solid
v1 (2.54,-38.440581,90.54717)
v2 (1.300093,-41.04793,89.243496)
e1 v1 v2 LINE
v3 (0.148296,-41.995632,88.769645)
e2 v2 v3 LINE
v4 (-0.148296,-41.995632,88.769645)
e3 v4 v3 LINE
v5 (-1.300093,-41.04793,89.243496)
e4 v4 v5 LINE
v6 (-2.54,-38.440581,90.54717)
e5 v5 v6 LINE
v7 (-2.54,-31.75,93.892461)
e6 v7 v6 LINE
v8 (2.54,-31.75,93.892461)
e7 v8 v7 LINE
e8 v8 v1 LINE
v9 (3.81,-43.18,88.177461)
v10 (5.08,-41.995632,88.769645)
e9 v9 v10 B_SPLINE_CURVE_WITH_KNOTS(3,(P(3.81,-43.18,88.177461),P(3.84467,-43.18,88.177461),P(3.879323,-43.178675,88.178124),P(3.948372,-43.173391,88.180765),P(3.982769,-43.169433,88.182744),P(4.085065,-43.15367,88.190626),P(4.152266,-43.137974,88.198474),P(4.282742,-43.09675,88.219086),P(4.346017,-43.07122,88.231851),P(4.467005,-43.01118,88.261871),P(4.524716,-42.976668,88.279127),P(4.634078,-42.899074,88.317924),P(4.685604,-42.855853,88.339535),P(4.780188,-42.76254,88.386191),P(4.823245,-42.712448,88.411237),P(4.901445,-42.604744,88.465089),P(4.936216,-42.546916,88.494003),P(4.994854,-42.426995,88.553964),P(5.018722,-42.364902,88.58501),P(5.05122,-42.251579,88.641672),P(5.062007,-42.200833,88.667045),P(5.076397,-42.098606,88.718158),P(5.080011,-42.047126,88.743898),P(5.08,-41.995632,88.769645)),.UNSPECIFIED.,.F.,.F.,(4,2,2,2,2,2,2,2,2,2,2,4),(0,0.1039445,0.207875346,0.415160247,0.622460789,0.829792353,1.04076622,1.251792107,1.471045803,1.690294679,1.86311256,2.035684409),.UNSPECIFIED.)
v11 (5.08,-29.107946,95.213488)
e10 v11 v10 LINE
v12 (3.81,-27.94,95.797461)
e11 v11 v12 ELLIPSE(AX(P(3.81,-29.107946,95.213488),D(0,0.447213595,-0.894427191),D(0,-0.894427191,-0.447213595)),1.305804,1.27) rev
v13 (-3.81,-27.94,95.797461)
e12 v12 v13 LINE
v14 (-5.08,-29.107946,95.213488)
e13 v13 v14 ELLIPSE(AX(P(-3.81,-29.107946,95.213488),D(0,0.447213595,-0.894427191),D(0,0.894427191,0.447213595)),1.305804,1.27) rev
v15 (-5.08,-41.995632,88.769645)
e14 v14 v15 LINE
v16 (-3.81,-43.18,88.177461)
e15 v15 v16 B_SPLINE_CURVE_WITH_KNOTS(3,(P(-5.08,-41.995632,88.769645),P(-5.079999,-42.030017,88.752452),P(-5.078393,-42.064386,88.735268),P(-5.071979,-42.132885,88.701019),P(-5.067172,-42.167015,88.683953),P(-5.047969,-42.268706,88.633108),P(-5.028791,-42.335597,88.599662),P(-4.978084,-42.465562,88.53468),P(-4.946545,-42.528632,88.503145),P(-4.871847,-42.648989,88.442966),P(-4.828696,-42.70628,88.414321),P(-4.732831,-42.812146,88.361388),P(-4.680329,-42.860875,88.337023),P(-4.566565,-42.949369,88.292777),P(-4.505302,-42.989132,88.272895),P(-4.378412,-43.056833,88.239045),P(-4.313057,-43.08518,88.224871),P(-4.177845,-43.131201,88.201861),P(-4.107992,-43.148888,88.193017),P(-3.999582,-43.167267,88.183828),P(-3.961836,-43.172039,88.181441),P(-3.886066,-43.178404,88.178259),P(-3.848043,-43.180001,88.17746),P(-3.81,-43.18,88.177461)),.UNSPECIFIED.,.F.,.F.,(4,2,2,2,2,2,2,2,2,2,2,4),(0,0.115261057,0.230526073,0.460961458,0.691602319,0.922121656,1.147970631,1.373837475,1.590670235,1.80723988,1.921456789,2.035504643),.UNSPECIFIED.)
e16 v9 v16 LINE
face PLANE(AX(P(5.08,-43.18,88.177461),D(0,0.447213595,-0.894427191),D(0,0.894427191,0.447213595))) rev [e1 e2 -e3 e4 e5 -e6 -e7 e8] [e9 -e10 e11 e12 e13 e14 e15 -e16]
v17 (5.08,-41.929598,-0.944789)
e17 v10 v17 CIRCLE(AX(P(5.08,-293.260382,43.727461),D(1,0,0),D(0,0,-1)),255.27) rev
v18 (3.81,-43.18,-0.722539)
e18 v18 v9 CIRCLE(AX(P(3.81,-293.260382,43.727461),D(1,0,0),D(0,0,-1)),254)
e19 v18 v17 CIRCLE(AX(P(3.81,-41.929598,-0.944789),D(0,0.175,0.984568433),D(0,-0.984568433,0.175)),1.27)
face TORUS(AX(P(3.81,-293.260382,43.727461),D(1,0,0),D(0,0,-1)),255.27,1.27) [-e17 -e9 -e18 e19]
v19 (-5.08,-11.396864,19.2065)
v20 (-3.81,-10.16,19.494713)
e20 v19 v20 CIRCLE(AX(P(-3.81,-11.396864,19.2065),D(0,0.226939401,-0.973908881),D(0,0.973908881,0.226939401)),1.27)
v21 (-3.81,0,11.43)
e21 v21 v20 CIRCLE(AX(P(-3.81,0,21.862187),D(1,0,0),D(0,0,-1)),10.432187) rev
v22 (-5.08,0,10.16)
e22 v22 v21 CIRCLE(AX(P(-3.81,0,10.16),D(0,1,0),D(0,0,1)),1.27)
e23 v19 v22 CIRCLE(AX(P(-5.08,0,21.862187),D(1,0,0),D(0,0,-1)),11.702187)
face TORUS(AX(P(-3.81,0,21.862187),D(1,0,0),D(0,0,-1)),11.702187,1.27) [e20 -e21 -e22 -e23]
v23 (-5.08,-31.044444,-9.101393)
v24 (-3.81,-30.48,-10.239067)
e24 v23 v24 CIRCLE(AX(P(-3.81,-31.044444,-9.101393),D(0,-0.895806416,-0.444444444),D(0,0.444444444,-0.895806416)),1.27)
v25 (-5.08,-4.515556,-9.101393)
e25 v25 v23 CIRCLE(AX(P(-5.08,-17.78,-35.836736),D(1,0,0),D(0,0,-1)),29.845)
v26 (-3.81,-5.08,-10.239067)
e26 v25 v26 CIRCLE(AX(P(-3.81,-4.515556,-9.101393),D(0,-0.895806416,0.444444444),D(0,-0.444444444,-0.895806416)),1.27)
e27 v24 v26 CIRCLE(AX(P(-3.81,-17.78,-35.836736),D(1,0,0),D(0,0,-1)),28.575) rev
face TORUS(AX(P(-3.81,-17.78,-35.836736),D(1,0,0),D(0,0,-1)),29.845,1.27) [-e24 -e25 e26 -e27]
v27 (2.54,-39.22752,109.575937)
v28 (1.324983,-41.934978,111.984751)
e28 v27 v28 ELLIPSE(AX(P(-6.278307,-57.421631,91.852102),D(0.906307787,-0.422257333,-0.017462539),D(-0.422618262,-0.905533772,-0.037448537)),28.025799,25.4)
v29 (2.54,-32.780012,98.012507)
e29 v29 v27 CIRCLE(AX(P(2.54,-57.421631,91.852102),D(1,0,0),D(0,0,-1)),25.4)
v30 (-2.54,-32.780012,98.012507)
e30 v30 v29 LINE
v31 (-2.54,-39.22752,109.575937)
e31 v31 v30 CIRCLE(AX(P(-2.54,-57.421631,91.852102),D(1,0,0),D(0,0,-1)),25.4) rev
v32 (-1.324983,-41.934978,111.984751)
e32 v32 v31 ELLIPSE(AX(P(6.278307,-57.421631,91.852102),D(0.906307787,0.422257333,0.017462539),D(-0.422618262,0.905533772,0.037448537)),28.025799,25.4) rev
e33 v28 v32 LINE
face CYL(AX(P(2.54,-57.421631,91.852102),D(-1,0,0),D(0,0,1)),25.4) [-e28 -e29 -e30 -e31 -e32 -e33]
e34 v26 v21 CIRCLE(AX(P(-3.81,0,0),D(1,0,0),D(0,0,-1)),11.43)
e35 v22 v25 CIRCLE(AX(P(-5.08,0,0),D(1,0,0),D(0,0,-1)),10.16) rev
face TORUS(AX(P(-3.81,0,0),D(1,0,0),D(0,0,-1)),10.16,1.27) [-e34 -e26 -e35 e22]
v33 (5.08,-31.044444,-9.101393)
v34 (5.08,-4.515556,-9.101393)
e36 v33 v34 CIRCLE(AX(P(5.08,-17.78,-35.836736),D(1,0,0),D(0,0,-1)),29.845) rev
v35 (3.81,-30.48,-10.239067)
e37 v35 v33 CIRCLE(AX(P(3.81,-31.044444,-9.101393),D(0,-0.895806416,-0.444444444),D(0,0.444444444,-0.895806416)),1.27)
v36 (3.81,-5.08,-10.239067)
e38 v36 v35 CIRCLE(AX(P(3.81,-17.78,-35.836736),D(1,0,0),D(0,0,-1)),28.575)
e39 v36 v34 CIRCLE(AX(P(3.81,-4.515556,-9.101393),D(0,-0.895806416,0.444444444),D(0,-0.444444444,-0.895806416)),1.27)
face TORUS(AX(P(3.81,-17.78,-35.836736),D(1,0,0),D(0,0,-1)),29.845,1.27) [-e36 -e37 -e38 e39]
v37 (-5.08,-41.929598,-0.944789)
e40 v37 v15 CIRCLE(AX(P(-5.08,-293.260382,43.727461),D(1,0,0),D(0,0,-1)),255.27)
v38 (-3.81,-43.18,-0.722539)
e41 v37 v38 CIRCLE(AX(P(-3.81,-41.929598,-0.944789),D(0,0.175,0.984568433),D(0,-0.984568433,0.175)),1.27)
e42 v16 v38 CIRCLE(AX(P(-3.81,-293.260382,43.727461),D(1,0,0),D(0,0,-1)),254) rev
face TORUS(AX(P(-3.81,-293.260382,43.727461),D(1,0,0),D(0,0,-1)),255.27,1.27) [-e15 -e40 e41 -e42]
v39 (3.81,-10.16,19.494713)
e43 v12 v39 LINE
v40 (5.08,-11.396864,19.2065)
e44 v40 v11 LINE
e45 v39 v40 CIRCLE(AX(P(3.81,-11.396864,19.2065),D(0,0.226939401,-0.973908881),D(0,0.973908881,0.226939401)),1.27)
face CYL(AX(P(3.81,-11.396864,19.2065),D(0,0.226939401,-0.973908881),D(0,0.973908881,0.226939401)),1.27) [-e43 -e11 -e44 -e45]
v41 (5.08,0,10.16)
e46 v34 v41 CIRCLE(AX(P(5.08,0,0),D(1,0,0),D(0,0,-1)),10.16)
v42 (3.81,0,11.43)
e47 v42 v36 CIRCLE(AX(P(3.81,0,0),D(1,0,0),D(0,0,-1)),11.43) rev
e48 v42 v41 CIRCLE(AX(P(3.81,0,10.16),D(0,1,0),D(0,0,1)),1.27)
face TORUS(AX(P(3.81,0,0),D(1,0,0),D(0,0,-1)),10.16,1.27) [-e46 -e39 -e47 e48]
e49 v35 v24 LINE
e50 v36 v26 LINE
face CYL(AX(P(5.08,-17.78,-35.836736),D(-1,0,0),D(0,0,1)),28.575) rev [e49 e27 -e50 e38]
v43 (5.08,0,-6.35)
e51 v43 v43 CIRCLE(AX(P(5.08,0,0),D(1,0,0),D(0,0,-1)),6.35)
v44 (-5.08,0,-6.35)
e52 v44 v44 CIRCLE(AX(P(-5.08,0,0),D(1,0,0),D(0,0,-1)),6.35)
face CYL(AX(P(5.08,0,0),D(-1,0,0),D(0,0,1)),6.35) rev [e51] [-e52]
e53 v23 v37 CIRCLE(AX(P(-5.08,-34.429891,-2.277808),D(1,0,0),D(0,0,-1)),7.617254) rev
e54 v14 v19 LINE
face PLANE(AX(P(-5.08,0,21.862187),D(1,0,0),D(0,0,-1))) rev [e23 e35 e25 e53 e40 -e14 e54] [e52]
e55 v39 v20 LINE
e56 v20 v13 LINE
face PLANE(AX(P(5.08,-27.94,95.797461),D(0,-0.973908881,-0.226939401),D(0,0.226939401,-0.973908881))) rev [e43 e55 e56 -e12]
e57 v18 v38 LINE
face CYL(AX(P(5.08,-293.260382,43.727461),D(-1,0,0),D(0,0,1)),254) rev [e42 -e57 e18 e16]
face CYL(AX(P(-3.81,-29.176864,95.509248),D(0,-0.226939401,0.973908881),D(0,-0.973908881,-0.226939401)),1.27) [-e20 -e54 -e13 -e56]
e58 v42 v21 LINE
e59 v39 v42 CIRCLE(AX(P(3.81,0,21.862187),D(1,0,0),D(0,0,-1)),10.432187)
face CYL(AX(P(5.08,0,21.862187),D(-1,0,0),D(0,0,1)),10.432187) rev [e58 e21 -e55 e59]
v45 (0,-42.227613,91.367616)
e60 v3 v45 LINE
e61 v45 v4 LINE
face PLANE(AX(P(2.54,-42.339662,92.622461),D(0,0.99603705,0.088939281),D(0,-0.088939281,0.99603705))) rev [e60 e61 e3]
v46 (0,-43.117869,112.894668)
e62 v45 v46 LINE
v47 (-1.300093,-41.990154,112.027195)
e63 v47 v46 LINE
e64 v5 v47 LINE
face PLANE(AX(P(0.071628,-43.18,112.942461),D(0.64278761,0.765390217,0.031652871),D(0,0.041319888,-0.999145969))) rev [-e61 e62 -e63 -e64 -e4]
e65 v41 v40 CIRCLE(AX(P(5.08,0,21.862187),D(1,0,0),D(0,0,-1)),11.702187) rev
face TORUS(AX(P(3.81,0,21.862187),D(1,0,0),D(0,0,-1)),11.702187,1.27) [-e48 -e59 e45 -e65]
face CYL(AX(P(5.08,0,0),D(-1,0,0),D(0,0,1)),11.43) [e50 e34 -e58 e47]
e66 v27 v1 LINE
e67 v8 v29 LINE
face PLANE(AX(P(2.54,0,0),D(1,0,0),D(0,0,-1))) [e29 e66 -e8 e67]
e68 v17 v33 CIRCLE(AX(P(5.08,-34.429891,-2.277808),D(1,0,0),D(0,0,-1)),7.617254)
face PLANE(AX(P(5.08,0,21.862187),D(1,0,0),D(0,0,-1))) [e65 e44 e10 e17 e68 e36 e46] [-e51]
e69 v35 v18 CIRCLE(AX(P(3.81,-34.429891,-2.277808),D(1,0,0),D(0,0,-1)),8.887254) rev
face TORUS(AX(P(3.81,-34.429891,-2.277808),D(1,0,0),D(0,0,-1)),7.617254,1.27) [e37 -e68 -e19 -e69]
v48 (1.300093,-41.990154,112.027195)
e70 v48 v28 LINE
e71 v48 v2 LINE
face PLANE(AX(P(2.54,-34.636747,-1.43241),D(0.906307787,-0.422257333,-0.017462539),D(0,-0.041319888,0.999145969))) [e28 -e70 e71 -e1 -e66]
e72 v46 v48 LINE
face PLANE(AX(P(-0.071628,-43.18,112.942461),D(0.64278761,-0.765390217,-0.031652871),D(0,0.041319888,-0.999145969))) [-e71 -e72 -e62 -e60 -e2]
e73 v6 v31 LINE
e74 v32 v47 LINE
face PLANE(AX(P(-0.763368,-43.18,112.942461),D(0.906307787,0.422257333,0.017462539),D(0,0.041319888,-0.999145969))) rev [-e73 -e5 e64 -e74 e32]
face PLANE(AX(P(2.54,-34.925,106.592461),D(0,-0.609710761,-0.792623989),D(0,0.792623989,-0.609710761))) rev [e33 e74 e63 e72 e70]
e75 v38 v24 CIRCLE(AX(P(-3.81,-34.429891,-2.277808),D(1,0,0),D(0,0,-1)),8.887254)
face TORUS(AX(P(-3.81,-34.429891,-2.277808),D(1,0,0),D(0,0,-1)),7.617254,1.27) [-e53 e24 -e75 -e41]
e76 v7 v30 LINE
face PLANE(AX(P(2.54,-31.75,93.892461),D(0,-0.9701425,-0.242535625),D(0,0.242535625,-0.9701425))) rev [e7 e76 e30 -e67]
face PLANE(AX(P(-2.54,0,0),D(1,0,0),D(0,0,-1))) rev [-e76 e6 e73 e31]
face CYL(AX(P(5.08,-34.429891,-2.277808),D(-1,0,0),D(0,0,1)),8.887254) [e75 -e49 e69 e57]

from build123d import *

# Parameters (mm, degrees)
SKETCH1_R           = 6.35
BOSS_EXTRUDE1_DEPTH = 5.08
FILLET1_R           = 1.27
BOSS_EXTRUDE2_DEPTH = 2.54
CHAMFER1_SIZE       = 3.81
CHAMFER1_SIZE_2     = 1.776632178
FILLET2_R           = 25.4


with BuildPart() as part:
    # Sketch1 → Boss-Extrude1 (new, symmetric)
    with BuildSketch(Plane(origin=(0, 0, 0), x_dir=(0, 0, -1), z_dir=(1, 0, 0))):
        with BuildLine():
            Line((-88.177460957, -43.18), (-95.797460957, -27.94))
            Line((-95.797460957, -27.94), (-19.494713075, -10.16))
            ThreePointArc((-19.494713075, -10.16), (-13.691248965, -6.485853779), (-11.43, 0))
            ThreePointArc((-11.43, 0), (2.608865683, 11.128284677), (10.23906734, -5.08))
            ThreePointArc((10.23906734, -5.08), (7.261735691, -17.78), (10.23906734, -30.48))
            ThreePointArc((10.23906734, -30.48), (9.389887981, -39.759205985), (0.722539043, -43.18))
            ThreePointArc((0.722539043, -43.18), (-43.727460957, -39.260382077), (-88.177460957, -43.18))
        make_face()
        Circle(SKETCH1_R, mode=Mode.SUBTRACT)
    extrude(amount=BOSS_EXTRUDE1_DEPTH, both=True)

    # Fillet1
    fillet1_edges = [part.edges().sort_by_distance(p)[0] for p in [
        (5.08, -39.260382077, 43.727460957),
        (5.08, -39.759205985, -9.389887981),
        (5.08, -17.78, -7.261735691),
        (5.08, 11.128284677, -2.608865683),
        (5.08, -6.485853779, 13.691248965),
        (-5.08, 11.128284677, -2.608865683),
        (5.08, -19.05, 57.646087016),
        (-5.08, -17.78, -7.261735691),
        (-5.08, -39.759205985, -9.389887981),
        (-5.08, -39.260382077, 43.727460957),
        (-5.08, -19.05, 57.646087016),
        (-5.08, -6.485853779, 13.691248965),
    ]]
    fillet(fillet1_edges, radius=FILLET1_R)

    # Sketch3 → Boss-Extrude2 (add, symmetric)
    with BuildSketch(Plane(origin=(0, 0, 0), x_dir=(0, 0, -1), z_dir=(1, 0, 0))):
        Polygon((-93.892460957, -31.75), (-106.592460957, -34.925), (-112.942460957, -43.18), (-92.622460957, -42.339662192), (-43.915351624, -37.990451226), align=None)
    extrude(amount=BOSS_EXTRUDE2_DEPTH, both=True)

    # Chamfer1
    # the kernel refuses this chamfer: 3.81, 1.776632178 mm, written as the material it takes off along each edge
    with BuildSketch(Plane(origin=(-2.54, -43.587894094, 122.805646834), x_dir=(-0.016311164131110324, 0.9990130464553615, 0.041314391398951954), z_dir=(0, 0.041319888426956664, -0.999145968725483))) as chamfer1_piece_1_section:
        Polygon((CHAMFER1_SIZE * 0.999866964113, CHAMFER1_SIZE * 0.0163111641311), (-CHAMFER1_SIZE_2 * 0.0163111641272, CHAMFER1_SIZE_2 * 0.999866963871), (0, 0), align=None)
    chamfer1_piece_1 = extrude(amount=40.080601841, mode=Mode.PRIVATE)
    chamfer1_piece_1 = split(chamfer1_piece_1, bisect_by=Plane(origin=(-1.976451392, -34.769993735, 92.38246409), z_dir=(0, -0.44721359549995887, 0.8944271909999154)), keep=Keep.TOP, mode=Mode.PRIVATE)
    add(chamfer1_piece_1, mode=Mode.SUBTRACT)
    with BuildSketch(Plane(origin=(2.54, -43.587894094, 122.805646834), x_dir=(0.016311164131110324, 0.9990130464553615, 0.041314391398951954), z_dir=(0, 0.041319888426956664, -0.999145968725483))) as chamfer1_piece_2_section:
        Polygon((CHAMFER1_SIZE * 0.999866964113, -CHAMFER1_SIZE * 0.0163111641311), (-CHAMFER1_SIZE_2 * 0.0163111641272, -CHAMFER1_SIZE_2 * 0.999866963871), (0, 0), align=None)
    chamfer1_piece_2 = extrude(amount=40.080601841, mode=Mode.PRIVATE)
    chamfer1_piece_2 = split(chamfer1_piece_2, bisect_by=Plane(origin=(1.976451392, -34.769993735, 92.38246409), z_dir=(0, -0.44721359549995887, 0.8944271909999154)), keep=Keep.TOP, mode=Mode.PRIVATE)
    add(chamfer1_piece_2, mode=Mode.SUBTRACT)

    # Fillet2
    fillet2_edges = [part.edges().sort_by_distance(p)[0] for p in [
        (0, -34.925, 106.592460957),
    ]]
    fillet(fillet2_edges, radius=FILLET2_R)

    # Chamfer2
    # the kernel refuses this chamfer: 1.27, 0.83499617 mm, written as the material it takes off along each edge
    with BuildSketch(Plane(origin=(-0.763367822, -43.506315275, 120.833009659), x_dir=(0.9993026620124814, -0.03730696112582517, -0.0015428371024072082), z_dir=(0, 0.04131988842701986, -0.9991459687254804))) as chamfer2_piece_1_section:
        with BuildLine():
            Line((0.874521065, 0), (-0.619435505, -1.161345341))
            Line((-0.619435505, -1.161345341), (-0.642038856, -1.149758774))
            ThreePointArc((-0.642038856, -1.149758774), (-0.322768515, -0.573982799), (-0.022603351, 0.011586567))
            Line((-0.022603351, 0.011586567), (0.000948407, 0.025382288))
            ThreePointArc((0.000948407, 0.025382288), (0.437599315, 0.009066868), (0.875469472, 0.025382288))
            Line((0.875469472, 0.025382288), (0.874521065, 0))
        make_face()
    chamfer2_piece_1 = extrude(amount=36.131955223, mode=Mode.PRIVATE)
    chamfer2_piece_1 = split(chamfer2_piece_1, bisect_by=Plane(origin=(-0.672553729, -35.934823141, 91.800049387), z_dir=(0, -0.44721359549995887, 0.8944271909999154)), keep=Keep.TOP, mode=Mode.PRIVATE)
    add(chamfer2_piece_1, mode=Mode.SUBTRACT)
    with BuildSketch(Plane(origin=(0.763367822, -43.506315275, 120.833009659), x_dir=(0.4373449734128742, 0.8985257946973667, 0.03715872029494756), z_dir=(0, 0.04131988842701986, -0.9991459687254804))) as chamfer2_piece_2_section:
        with BuildLine():
            Line((1.316215539, 0), (-0.411565873, -0.771622074))
            Line((-0.411565873, -0.771622074), (-0.434407936, -0.760513512))
            ThreePointArc((-0.434407936, -0.760513512), (-0.213942404, -0.381842921), (-0.022842063, 0.011108562))
            Line((-0.022842063, 0.011108562), (0.000414304, 0.025396621))
            ThreePointArc((0.000414304, 0.025396621), (0.658346981, 0.014663545), (1.316629843, 0.025396621))
            Line((1.316629843, 0.025396621), (1.316215539, 0))
        make_face()
    chamfer2_piece_2 = extrude(amount=36.131955223, mode=Mode.PRIVATE)
    chamfer2_piece_2 = split(chamfer2_piece_2, bisect_by=Plane(origin=(0.672553729, -35.934823141, 91.800049387), z_dir=(0, -0.44721359549995887, 0.8944271909999154)), keep=Keep.TOP, mode=Mode.PRIVATE)
    add(chamfer2_piece_2, mode=Mode.SUBTRACT)


solid = part.part
